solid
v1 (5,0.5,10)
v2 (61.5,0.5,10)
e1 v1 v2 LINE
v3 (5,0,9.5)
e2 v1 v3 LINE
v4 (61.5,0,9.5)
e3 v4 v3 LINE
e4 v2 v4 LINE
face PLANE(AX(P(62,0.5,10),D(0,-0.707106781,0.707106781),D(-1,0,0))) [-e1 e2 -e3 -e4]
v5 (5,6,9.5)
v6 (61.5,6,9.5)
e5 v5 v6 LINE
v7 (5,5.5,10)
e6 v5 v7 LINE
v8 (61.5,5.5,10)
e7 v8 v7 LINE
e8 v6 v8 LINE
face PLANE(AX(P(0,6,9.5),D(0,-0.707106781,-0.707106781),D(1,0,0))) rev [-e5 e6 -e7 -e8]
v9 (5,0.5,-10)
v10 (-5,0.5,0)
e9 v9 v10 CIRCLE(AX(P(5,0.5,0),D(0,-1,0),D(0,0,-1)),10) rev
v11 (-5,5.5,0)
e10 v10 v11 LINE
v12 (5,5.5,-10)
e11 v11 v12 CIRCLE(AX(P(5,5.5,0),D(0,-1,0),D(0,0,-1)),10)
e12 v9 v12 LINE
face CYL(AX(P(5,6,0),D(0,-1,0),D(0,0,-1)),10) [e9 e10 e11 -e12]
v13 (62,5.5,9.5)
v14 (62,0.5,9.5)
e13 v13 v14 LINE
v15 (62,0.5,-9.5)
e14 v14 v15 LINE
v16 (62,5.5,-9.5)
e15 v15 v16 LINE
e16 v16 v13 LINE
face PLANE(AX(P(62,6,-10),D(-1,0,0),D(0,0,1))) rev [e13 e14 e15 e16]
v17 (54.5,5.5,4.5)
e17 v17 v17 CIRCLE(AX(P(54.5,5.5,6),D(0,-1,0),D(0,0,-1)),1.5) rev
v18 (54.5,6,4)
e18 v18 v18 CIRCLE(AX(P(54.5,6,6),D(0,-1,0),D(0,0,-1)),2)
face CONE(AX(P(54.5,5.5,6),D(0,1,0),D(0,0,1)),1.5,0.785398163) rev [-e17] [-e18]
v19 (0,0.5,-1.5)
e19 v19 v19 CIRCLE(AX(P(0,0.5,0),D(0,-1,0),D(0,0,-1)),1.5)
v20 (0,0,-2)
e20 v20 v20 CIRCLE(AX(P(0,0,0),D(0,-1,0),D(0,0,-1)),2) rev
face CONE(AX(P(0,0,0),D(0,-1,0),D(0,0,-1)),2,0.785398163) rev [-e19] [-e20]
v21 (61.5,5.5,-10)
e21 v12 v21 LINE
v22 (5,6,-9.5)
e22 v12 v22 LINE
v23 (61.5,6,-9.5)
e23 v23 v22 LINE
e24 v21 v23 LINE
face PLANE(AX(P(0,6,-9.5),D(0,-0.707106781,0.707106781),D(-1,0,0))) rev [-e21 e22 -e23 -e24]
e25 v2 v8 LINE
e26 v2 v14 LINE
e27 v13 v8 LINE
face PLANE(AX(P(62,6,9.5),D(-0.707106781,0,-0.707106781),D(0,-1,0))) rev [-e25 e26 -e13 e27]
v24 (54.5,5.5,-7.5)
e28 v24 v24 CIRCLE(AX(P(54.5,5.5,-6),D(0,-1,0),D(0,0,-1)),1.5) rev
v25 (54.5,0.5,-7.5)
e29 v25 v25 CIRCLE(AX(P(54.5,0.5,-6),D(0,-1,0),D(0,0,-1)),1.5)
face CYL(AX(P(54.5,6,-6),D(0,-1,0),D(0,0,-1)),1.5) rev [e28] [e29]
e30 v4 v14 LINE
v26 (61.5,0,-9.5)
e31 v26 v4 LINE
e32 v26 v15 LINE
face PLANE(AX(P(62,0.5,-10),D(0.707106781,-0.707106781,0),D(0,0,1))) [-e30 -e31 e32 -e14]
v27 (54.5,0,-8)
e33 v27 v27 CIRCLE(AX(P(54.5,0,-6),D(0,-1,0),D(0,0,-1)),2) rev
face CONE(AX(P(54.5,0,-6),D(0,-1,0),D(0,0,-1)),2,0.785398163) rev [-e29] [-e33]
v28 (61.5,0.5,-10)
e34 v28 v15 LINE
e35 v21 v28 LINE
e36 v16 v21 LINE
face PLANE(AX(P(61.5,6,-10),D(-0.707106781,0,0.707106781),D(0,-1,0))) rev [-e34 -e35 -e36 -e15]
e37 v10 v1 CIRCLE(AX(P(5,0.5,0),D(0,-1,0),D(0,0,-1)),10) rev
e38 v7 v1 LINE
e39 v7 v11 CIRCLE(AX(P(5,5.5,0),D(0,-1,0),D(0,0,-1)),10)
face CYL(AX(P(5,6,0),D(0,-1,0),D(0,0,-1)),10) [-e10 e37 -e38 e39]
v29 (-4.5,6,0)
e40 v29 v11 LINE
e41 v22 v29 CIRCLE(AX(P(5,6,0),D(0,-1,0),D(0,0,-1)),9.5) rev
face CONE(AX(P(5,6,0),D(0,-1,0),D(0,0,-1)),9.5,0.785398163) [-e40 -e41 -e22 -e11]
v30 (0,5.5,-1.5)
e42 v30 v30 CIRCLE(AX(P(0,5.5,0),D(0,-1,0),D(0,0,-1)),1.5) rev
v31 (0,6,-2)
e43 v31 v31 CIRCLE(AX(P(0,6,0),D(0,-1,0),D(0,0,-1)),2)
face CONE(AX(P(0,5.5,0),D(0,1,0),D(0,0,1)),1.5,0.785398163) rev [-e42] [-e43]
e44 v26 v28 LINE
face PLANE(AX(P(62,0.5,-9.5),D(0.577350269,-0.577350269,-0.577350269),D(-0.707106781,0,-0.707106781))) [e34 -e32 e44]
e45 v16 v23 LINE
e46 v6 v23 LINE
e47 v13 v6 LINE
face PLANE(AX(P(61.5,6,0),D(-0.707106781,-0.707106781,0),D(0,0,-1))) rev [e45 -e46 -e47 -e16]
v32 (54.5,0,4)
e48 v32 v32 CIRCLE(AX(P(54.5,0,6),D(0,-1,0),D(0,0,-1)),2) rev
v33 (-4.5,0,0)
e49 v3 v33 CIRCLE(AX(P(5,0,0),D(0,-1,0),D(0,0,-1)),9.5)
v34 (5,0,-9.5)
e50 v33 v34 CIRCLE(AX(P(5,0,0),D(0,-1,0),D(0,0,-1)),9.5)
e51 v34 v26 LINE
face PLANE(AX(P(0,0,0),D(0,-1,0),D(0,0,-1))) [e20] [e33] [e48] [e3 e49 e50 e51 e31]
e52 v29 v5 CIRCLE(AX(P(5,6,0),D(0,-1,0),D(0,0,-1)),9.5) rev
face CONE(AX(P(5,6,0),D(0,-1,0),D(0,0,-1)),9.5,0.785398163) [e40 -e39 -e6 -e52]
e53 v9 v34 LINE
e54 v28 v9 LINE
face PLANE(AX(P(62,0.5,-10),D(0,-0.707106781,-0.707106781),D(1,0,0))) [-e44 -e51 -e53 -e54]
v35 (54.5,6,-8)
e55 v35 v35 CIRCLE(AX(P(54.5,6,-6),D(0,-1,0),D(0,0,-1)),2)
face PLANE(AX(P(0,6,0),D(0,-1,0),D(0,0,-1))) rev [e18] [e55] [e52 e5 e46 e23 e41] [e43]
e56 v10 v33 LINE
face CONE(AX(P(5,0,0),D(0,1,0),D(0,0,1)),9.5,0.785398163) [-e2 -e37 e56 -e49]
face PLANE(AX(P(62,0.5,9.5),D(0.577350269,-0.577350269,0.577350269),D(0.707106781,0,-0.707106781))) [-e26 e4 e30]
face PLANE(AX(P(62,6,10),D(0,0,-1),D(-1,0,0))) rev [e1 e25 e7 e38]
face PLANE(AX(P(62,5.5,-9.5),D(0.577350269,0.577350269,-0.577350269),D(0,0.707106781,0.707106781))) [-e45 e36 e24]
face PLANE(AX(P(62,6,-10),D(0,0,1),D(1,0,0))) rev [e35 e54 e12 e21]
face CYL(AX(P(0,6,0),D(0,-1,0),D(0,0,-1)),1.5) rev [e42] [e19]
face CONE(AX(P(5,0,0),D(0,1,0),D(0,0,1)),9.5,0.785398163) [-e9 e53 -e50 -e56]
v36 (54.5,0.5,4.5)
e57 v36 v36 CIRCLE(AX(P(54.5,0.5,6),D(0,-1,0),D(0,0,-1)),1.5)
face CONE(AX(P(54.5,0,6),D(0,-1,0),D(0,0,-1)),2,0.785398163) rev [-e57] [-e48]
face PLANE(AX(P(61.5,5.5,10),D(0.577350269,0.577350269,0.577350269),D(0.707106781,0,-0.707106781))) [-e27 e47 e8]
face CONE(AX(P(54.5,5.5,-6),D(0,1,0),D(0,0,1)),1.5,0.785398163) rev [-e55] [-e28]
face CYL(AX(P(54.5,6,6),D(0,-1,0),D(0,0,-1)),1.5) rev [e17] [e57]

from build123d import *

# Parameters (mm, degrees)
CROQUIS1_W              = 67
CROQUIS1_H              = 20
CROQUIS1_R              = 1.5
SALIENTE_EXTRUIR1_DEPTH = 6
REDONDEO1_R             = 10
CHAFL_N2_SIZE           = 0.5


with BuildPart() as part:
    # Croquis1 → Saliente-Extruir1 (new body)
    with BuildSketch(Plane(origin=(0, 0, 0), x_dir=(1, 0, 0), z_dir=(0, 1, 0))):
        with Locations((28.5, 0)):
            Rectangle(CROQUIS1_W, CROQUIS1_H)
        with Locations(Location((0, 0, 0), (0, 0, 270))):
            Circle(CROQUIS1_R, mode=Mode.SUBTRACT)
        with Locations(Location((54.5, 6, 0), (0, 0, 270))):
            Circle(CROQUIS1_R, mode=Mode.SUBTRACT)
        with Locations(Location((54.5, -6, 0), (0, 0, 270))):
            Circle(CROQUIS1_R, mode=Mode.SUBTRACT)
    extrude(amount=SALIENTE_EXTRUIR1_DEPTH)

    # Redondeo1
    redondeo1_edges = [part.edges().sort_by_distance(p)[0] for p in [
        (-5, 3, -10),
        (-5, 3, 10),
    ]]
    fillet(redondeo1_edges, radius=REDONDEO1_R - 0.0001)  # a hair under: the kernel refuses the full size

    # Chaflán2
    chafl_n2_edges = [part.edges().sort_by_distance(p)[0] for p in [
        (0, 0, -1.5),
        (0, 6, -1.5),
        (54.5, 0, -7.5),
        (54.5, 6, -7.5),
        (54.5, 0, 4.5),
        (54.5, 6, 4.5),
        (33.49995, 0, 10),
        (-2.071097101, 0, 7.071097101),
        (-2.071097101, 0, -7.071097101),
        (33.49995, 6, 10),
        (-2.071097101, 6, 7.071097101),
        (-2.071097101, 6, -7.071097101),
        (62, 6, 0),
        (33.49995, 0, -10),
        (62, 0, 0),
        (33.49995, 6, -10),
        (62, 3, 10),
        (62, 3, -10),
    ]]
    chamfer(chafl_n2_edges, length=CHAFL_N2_SIZE)


solid = part.part
